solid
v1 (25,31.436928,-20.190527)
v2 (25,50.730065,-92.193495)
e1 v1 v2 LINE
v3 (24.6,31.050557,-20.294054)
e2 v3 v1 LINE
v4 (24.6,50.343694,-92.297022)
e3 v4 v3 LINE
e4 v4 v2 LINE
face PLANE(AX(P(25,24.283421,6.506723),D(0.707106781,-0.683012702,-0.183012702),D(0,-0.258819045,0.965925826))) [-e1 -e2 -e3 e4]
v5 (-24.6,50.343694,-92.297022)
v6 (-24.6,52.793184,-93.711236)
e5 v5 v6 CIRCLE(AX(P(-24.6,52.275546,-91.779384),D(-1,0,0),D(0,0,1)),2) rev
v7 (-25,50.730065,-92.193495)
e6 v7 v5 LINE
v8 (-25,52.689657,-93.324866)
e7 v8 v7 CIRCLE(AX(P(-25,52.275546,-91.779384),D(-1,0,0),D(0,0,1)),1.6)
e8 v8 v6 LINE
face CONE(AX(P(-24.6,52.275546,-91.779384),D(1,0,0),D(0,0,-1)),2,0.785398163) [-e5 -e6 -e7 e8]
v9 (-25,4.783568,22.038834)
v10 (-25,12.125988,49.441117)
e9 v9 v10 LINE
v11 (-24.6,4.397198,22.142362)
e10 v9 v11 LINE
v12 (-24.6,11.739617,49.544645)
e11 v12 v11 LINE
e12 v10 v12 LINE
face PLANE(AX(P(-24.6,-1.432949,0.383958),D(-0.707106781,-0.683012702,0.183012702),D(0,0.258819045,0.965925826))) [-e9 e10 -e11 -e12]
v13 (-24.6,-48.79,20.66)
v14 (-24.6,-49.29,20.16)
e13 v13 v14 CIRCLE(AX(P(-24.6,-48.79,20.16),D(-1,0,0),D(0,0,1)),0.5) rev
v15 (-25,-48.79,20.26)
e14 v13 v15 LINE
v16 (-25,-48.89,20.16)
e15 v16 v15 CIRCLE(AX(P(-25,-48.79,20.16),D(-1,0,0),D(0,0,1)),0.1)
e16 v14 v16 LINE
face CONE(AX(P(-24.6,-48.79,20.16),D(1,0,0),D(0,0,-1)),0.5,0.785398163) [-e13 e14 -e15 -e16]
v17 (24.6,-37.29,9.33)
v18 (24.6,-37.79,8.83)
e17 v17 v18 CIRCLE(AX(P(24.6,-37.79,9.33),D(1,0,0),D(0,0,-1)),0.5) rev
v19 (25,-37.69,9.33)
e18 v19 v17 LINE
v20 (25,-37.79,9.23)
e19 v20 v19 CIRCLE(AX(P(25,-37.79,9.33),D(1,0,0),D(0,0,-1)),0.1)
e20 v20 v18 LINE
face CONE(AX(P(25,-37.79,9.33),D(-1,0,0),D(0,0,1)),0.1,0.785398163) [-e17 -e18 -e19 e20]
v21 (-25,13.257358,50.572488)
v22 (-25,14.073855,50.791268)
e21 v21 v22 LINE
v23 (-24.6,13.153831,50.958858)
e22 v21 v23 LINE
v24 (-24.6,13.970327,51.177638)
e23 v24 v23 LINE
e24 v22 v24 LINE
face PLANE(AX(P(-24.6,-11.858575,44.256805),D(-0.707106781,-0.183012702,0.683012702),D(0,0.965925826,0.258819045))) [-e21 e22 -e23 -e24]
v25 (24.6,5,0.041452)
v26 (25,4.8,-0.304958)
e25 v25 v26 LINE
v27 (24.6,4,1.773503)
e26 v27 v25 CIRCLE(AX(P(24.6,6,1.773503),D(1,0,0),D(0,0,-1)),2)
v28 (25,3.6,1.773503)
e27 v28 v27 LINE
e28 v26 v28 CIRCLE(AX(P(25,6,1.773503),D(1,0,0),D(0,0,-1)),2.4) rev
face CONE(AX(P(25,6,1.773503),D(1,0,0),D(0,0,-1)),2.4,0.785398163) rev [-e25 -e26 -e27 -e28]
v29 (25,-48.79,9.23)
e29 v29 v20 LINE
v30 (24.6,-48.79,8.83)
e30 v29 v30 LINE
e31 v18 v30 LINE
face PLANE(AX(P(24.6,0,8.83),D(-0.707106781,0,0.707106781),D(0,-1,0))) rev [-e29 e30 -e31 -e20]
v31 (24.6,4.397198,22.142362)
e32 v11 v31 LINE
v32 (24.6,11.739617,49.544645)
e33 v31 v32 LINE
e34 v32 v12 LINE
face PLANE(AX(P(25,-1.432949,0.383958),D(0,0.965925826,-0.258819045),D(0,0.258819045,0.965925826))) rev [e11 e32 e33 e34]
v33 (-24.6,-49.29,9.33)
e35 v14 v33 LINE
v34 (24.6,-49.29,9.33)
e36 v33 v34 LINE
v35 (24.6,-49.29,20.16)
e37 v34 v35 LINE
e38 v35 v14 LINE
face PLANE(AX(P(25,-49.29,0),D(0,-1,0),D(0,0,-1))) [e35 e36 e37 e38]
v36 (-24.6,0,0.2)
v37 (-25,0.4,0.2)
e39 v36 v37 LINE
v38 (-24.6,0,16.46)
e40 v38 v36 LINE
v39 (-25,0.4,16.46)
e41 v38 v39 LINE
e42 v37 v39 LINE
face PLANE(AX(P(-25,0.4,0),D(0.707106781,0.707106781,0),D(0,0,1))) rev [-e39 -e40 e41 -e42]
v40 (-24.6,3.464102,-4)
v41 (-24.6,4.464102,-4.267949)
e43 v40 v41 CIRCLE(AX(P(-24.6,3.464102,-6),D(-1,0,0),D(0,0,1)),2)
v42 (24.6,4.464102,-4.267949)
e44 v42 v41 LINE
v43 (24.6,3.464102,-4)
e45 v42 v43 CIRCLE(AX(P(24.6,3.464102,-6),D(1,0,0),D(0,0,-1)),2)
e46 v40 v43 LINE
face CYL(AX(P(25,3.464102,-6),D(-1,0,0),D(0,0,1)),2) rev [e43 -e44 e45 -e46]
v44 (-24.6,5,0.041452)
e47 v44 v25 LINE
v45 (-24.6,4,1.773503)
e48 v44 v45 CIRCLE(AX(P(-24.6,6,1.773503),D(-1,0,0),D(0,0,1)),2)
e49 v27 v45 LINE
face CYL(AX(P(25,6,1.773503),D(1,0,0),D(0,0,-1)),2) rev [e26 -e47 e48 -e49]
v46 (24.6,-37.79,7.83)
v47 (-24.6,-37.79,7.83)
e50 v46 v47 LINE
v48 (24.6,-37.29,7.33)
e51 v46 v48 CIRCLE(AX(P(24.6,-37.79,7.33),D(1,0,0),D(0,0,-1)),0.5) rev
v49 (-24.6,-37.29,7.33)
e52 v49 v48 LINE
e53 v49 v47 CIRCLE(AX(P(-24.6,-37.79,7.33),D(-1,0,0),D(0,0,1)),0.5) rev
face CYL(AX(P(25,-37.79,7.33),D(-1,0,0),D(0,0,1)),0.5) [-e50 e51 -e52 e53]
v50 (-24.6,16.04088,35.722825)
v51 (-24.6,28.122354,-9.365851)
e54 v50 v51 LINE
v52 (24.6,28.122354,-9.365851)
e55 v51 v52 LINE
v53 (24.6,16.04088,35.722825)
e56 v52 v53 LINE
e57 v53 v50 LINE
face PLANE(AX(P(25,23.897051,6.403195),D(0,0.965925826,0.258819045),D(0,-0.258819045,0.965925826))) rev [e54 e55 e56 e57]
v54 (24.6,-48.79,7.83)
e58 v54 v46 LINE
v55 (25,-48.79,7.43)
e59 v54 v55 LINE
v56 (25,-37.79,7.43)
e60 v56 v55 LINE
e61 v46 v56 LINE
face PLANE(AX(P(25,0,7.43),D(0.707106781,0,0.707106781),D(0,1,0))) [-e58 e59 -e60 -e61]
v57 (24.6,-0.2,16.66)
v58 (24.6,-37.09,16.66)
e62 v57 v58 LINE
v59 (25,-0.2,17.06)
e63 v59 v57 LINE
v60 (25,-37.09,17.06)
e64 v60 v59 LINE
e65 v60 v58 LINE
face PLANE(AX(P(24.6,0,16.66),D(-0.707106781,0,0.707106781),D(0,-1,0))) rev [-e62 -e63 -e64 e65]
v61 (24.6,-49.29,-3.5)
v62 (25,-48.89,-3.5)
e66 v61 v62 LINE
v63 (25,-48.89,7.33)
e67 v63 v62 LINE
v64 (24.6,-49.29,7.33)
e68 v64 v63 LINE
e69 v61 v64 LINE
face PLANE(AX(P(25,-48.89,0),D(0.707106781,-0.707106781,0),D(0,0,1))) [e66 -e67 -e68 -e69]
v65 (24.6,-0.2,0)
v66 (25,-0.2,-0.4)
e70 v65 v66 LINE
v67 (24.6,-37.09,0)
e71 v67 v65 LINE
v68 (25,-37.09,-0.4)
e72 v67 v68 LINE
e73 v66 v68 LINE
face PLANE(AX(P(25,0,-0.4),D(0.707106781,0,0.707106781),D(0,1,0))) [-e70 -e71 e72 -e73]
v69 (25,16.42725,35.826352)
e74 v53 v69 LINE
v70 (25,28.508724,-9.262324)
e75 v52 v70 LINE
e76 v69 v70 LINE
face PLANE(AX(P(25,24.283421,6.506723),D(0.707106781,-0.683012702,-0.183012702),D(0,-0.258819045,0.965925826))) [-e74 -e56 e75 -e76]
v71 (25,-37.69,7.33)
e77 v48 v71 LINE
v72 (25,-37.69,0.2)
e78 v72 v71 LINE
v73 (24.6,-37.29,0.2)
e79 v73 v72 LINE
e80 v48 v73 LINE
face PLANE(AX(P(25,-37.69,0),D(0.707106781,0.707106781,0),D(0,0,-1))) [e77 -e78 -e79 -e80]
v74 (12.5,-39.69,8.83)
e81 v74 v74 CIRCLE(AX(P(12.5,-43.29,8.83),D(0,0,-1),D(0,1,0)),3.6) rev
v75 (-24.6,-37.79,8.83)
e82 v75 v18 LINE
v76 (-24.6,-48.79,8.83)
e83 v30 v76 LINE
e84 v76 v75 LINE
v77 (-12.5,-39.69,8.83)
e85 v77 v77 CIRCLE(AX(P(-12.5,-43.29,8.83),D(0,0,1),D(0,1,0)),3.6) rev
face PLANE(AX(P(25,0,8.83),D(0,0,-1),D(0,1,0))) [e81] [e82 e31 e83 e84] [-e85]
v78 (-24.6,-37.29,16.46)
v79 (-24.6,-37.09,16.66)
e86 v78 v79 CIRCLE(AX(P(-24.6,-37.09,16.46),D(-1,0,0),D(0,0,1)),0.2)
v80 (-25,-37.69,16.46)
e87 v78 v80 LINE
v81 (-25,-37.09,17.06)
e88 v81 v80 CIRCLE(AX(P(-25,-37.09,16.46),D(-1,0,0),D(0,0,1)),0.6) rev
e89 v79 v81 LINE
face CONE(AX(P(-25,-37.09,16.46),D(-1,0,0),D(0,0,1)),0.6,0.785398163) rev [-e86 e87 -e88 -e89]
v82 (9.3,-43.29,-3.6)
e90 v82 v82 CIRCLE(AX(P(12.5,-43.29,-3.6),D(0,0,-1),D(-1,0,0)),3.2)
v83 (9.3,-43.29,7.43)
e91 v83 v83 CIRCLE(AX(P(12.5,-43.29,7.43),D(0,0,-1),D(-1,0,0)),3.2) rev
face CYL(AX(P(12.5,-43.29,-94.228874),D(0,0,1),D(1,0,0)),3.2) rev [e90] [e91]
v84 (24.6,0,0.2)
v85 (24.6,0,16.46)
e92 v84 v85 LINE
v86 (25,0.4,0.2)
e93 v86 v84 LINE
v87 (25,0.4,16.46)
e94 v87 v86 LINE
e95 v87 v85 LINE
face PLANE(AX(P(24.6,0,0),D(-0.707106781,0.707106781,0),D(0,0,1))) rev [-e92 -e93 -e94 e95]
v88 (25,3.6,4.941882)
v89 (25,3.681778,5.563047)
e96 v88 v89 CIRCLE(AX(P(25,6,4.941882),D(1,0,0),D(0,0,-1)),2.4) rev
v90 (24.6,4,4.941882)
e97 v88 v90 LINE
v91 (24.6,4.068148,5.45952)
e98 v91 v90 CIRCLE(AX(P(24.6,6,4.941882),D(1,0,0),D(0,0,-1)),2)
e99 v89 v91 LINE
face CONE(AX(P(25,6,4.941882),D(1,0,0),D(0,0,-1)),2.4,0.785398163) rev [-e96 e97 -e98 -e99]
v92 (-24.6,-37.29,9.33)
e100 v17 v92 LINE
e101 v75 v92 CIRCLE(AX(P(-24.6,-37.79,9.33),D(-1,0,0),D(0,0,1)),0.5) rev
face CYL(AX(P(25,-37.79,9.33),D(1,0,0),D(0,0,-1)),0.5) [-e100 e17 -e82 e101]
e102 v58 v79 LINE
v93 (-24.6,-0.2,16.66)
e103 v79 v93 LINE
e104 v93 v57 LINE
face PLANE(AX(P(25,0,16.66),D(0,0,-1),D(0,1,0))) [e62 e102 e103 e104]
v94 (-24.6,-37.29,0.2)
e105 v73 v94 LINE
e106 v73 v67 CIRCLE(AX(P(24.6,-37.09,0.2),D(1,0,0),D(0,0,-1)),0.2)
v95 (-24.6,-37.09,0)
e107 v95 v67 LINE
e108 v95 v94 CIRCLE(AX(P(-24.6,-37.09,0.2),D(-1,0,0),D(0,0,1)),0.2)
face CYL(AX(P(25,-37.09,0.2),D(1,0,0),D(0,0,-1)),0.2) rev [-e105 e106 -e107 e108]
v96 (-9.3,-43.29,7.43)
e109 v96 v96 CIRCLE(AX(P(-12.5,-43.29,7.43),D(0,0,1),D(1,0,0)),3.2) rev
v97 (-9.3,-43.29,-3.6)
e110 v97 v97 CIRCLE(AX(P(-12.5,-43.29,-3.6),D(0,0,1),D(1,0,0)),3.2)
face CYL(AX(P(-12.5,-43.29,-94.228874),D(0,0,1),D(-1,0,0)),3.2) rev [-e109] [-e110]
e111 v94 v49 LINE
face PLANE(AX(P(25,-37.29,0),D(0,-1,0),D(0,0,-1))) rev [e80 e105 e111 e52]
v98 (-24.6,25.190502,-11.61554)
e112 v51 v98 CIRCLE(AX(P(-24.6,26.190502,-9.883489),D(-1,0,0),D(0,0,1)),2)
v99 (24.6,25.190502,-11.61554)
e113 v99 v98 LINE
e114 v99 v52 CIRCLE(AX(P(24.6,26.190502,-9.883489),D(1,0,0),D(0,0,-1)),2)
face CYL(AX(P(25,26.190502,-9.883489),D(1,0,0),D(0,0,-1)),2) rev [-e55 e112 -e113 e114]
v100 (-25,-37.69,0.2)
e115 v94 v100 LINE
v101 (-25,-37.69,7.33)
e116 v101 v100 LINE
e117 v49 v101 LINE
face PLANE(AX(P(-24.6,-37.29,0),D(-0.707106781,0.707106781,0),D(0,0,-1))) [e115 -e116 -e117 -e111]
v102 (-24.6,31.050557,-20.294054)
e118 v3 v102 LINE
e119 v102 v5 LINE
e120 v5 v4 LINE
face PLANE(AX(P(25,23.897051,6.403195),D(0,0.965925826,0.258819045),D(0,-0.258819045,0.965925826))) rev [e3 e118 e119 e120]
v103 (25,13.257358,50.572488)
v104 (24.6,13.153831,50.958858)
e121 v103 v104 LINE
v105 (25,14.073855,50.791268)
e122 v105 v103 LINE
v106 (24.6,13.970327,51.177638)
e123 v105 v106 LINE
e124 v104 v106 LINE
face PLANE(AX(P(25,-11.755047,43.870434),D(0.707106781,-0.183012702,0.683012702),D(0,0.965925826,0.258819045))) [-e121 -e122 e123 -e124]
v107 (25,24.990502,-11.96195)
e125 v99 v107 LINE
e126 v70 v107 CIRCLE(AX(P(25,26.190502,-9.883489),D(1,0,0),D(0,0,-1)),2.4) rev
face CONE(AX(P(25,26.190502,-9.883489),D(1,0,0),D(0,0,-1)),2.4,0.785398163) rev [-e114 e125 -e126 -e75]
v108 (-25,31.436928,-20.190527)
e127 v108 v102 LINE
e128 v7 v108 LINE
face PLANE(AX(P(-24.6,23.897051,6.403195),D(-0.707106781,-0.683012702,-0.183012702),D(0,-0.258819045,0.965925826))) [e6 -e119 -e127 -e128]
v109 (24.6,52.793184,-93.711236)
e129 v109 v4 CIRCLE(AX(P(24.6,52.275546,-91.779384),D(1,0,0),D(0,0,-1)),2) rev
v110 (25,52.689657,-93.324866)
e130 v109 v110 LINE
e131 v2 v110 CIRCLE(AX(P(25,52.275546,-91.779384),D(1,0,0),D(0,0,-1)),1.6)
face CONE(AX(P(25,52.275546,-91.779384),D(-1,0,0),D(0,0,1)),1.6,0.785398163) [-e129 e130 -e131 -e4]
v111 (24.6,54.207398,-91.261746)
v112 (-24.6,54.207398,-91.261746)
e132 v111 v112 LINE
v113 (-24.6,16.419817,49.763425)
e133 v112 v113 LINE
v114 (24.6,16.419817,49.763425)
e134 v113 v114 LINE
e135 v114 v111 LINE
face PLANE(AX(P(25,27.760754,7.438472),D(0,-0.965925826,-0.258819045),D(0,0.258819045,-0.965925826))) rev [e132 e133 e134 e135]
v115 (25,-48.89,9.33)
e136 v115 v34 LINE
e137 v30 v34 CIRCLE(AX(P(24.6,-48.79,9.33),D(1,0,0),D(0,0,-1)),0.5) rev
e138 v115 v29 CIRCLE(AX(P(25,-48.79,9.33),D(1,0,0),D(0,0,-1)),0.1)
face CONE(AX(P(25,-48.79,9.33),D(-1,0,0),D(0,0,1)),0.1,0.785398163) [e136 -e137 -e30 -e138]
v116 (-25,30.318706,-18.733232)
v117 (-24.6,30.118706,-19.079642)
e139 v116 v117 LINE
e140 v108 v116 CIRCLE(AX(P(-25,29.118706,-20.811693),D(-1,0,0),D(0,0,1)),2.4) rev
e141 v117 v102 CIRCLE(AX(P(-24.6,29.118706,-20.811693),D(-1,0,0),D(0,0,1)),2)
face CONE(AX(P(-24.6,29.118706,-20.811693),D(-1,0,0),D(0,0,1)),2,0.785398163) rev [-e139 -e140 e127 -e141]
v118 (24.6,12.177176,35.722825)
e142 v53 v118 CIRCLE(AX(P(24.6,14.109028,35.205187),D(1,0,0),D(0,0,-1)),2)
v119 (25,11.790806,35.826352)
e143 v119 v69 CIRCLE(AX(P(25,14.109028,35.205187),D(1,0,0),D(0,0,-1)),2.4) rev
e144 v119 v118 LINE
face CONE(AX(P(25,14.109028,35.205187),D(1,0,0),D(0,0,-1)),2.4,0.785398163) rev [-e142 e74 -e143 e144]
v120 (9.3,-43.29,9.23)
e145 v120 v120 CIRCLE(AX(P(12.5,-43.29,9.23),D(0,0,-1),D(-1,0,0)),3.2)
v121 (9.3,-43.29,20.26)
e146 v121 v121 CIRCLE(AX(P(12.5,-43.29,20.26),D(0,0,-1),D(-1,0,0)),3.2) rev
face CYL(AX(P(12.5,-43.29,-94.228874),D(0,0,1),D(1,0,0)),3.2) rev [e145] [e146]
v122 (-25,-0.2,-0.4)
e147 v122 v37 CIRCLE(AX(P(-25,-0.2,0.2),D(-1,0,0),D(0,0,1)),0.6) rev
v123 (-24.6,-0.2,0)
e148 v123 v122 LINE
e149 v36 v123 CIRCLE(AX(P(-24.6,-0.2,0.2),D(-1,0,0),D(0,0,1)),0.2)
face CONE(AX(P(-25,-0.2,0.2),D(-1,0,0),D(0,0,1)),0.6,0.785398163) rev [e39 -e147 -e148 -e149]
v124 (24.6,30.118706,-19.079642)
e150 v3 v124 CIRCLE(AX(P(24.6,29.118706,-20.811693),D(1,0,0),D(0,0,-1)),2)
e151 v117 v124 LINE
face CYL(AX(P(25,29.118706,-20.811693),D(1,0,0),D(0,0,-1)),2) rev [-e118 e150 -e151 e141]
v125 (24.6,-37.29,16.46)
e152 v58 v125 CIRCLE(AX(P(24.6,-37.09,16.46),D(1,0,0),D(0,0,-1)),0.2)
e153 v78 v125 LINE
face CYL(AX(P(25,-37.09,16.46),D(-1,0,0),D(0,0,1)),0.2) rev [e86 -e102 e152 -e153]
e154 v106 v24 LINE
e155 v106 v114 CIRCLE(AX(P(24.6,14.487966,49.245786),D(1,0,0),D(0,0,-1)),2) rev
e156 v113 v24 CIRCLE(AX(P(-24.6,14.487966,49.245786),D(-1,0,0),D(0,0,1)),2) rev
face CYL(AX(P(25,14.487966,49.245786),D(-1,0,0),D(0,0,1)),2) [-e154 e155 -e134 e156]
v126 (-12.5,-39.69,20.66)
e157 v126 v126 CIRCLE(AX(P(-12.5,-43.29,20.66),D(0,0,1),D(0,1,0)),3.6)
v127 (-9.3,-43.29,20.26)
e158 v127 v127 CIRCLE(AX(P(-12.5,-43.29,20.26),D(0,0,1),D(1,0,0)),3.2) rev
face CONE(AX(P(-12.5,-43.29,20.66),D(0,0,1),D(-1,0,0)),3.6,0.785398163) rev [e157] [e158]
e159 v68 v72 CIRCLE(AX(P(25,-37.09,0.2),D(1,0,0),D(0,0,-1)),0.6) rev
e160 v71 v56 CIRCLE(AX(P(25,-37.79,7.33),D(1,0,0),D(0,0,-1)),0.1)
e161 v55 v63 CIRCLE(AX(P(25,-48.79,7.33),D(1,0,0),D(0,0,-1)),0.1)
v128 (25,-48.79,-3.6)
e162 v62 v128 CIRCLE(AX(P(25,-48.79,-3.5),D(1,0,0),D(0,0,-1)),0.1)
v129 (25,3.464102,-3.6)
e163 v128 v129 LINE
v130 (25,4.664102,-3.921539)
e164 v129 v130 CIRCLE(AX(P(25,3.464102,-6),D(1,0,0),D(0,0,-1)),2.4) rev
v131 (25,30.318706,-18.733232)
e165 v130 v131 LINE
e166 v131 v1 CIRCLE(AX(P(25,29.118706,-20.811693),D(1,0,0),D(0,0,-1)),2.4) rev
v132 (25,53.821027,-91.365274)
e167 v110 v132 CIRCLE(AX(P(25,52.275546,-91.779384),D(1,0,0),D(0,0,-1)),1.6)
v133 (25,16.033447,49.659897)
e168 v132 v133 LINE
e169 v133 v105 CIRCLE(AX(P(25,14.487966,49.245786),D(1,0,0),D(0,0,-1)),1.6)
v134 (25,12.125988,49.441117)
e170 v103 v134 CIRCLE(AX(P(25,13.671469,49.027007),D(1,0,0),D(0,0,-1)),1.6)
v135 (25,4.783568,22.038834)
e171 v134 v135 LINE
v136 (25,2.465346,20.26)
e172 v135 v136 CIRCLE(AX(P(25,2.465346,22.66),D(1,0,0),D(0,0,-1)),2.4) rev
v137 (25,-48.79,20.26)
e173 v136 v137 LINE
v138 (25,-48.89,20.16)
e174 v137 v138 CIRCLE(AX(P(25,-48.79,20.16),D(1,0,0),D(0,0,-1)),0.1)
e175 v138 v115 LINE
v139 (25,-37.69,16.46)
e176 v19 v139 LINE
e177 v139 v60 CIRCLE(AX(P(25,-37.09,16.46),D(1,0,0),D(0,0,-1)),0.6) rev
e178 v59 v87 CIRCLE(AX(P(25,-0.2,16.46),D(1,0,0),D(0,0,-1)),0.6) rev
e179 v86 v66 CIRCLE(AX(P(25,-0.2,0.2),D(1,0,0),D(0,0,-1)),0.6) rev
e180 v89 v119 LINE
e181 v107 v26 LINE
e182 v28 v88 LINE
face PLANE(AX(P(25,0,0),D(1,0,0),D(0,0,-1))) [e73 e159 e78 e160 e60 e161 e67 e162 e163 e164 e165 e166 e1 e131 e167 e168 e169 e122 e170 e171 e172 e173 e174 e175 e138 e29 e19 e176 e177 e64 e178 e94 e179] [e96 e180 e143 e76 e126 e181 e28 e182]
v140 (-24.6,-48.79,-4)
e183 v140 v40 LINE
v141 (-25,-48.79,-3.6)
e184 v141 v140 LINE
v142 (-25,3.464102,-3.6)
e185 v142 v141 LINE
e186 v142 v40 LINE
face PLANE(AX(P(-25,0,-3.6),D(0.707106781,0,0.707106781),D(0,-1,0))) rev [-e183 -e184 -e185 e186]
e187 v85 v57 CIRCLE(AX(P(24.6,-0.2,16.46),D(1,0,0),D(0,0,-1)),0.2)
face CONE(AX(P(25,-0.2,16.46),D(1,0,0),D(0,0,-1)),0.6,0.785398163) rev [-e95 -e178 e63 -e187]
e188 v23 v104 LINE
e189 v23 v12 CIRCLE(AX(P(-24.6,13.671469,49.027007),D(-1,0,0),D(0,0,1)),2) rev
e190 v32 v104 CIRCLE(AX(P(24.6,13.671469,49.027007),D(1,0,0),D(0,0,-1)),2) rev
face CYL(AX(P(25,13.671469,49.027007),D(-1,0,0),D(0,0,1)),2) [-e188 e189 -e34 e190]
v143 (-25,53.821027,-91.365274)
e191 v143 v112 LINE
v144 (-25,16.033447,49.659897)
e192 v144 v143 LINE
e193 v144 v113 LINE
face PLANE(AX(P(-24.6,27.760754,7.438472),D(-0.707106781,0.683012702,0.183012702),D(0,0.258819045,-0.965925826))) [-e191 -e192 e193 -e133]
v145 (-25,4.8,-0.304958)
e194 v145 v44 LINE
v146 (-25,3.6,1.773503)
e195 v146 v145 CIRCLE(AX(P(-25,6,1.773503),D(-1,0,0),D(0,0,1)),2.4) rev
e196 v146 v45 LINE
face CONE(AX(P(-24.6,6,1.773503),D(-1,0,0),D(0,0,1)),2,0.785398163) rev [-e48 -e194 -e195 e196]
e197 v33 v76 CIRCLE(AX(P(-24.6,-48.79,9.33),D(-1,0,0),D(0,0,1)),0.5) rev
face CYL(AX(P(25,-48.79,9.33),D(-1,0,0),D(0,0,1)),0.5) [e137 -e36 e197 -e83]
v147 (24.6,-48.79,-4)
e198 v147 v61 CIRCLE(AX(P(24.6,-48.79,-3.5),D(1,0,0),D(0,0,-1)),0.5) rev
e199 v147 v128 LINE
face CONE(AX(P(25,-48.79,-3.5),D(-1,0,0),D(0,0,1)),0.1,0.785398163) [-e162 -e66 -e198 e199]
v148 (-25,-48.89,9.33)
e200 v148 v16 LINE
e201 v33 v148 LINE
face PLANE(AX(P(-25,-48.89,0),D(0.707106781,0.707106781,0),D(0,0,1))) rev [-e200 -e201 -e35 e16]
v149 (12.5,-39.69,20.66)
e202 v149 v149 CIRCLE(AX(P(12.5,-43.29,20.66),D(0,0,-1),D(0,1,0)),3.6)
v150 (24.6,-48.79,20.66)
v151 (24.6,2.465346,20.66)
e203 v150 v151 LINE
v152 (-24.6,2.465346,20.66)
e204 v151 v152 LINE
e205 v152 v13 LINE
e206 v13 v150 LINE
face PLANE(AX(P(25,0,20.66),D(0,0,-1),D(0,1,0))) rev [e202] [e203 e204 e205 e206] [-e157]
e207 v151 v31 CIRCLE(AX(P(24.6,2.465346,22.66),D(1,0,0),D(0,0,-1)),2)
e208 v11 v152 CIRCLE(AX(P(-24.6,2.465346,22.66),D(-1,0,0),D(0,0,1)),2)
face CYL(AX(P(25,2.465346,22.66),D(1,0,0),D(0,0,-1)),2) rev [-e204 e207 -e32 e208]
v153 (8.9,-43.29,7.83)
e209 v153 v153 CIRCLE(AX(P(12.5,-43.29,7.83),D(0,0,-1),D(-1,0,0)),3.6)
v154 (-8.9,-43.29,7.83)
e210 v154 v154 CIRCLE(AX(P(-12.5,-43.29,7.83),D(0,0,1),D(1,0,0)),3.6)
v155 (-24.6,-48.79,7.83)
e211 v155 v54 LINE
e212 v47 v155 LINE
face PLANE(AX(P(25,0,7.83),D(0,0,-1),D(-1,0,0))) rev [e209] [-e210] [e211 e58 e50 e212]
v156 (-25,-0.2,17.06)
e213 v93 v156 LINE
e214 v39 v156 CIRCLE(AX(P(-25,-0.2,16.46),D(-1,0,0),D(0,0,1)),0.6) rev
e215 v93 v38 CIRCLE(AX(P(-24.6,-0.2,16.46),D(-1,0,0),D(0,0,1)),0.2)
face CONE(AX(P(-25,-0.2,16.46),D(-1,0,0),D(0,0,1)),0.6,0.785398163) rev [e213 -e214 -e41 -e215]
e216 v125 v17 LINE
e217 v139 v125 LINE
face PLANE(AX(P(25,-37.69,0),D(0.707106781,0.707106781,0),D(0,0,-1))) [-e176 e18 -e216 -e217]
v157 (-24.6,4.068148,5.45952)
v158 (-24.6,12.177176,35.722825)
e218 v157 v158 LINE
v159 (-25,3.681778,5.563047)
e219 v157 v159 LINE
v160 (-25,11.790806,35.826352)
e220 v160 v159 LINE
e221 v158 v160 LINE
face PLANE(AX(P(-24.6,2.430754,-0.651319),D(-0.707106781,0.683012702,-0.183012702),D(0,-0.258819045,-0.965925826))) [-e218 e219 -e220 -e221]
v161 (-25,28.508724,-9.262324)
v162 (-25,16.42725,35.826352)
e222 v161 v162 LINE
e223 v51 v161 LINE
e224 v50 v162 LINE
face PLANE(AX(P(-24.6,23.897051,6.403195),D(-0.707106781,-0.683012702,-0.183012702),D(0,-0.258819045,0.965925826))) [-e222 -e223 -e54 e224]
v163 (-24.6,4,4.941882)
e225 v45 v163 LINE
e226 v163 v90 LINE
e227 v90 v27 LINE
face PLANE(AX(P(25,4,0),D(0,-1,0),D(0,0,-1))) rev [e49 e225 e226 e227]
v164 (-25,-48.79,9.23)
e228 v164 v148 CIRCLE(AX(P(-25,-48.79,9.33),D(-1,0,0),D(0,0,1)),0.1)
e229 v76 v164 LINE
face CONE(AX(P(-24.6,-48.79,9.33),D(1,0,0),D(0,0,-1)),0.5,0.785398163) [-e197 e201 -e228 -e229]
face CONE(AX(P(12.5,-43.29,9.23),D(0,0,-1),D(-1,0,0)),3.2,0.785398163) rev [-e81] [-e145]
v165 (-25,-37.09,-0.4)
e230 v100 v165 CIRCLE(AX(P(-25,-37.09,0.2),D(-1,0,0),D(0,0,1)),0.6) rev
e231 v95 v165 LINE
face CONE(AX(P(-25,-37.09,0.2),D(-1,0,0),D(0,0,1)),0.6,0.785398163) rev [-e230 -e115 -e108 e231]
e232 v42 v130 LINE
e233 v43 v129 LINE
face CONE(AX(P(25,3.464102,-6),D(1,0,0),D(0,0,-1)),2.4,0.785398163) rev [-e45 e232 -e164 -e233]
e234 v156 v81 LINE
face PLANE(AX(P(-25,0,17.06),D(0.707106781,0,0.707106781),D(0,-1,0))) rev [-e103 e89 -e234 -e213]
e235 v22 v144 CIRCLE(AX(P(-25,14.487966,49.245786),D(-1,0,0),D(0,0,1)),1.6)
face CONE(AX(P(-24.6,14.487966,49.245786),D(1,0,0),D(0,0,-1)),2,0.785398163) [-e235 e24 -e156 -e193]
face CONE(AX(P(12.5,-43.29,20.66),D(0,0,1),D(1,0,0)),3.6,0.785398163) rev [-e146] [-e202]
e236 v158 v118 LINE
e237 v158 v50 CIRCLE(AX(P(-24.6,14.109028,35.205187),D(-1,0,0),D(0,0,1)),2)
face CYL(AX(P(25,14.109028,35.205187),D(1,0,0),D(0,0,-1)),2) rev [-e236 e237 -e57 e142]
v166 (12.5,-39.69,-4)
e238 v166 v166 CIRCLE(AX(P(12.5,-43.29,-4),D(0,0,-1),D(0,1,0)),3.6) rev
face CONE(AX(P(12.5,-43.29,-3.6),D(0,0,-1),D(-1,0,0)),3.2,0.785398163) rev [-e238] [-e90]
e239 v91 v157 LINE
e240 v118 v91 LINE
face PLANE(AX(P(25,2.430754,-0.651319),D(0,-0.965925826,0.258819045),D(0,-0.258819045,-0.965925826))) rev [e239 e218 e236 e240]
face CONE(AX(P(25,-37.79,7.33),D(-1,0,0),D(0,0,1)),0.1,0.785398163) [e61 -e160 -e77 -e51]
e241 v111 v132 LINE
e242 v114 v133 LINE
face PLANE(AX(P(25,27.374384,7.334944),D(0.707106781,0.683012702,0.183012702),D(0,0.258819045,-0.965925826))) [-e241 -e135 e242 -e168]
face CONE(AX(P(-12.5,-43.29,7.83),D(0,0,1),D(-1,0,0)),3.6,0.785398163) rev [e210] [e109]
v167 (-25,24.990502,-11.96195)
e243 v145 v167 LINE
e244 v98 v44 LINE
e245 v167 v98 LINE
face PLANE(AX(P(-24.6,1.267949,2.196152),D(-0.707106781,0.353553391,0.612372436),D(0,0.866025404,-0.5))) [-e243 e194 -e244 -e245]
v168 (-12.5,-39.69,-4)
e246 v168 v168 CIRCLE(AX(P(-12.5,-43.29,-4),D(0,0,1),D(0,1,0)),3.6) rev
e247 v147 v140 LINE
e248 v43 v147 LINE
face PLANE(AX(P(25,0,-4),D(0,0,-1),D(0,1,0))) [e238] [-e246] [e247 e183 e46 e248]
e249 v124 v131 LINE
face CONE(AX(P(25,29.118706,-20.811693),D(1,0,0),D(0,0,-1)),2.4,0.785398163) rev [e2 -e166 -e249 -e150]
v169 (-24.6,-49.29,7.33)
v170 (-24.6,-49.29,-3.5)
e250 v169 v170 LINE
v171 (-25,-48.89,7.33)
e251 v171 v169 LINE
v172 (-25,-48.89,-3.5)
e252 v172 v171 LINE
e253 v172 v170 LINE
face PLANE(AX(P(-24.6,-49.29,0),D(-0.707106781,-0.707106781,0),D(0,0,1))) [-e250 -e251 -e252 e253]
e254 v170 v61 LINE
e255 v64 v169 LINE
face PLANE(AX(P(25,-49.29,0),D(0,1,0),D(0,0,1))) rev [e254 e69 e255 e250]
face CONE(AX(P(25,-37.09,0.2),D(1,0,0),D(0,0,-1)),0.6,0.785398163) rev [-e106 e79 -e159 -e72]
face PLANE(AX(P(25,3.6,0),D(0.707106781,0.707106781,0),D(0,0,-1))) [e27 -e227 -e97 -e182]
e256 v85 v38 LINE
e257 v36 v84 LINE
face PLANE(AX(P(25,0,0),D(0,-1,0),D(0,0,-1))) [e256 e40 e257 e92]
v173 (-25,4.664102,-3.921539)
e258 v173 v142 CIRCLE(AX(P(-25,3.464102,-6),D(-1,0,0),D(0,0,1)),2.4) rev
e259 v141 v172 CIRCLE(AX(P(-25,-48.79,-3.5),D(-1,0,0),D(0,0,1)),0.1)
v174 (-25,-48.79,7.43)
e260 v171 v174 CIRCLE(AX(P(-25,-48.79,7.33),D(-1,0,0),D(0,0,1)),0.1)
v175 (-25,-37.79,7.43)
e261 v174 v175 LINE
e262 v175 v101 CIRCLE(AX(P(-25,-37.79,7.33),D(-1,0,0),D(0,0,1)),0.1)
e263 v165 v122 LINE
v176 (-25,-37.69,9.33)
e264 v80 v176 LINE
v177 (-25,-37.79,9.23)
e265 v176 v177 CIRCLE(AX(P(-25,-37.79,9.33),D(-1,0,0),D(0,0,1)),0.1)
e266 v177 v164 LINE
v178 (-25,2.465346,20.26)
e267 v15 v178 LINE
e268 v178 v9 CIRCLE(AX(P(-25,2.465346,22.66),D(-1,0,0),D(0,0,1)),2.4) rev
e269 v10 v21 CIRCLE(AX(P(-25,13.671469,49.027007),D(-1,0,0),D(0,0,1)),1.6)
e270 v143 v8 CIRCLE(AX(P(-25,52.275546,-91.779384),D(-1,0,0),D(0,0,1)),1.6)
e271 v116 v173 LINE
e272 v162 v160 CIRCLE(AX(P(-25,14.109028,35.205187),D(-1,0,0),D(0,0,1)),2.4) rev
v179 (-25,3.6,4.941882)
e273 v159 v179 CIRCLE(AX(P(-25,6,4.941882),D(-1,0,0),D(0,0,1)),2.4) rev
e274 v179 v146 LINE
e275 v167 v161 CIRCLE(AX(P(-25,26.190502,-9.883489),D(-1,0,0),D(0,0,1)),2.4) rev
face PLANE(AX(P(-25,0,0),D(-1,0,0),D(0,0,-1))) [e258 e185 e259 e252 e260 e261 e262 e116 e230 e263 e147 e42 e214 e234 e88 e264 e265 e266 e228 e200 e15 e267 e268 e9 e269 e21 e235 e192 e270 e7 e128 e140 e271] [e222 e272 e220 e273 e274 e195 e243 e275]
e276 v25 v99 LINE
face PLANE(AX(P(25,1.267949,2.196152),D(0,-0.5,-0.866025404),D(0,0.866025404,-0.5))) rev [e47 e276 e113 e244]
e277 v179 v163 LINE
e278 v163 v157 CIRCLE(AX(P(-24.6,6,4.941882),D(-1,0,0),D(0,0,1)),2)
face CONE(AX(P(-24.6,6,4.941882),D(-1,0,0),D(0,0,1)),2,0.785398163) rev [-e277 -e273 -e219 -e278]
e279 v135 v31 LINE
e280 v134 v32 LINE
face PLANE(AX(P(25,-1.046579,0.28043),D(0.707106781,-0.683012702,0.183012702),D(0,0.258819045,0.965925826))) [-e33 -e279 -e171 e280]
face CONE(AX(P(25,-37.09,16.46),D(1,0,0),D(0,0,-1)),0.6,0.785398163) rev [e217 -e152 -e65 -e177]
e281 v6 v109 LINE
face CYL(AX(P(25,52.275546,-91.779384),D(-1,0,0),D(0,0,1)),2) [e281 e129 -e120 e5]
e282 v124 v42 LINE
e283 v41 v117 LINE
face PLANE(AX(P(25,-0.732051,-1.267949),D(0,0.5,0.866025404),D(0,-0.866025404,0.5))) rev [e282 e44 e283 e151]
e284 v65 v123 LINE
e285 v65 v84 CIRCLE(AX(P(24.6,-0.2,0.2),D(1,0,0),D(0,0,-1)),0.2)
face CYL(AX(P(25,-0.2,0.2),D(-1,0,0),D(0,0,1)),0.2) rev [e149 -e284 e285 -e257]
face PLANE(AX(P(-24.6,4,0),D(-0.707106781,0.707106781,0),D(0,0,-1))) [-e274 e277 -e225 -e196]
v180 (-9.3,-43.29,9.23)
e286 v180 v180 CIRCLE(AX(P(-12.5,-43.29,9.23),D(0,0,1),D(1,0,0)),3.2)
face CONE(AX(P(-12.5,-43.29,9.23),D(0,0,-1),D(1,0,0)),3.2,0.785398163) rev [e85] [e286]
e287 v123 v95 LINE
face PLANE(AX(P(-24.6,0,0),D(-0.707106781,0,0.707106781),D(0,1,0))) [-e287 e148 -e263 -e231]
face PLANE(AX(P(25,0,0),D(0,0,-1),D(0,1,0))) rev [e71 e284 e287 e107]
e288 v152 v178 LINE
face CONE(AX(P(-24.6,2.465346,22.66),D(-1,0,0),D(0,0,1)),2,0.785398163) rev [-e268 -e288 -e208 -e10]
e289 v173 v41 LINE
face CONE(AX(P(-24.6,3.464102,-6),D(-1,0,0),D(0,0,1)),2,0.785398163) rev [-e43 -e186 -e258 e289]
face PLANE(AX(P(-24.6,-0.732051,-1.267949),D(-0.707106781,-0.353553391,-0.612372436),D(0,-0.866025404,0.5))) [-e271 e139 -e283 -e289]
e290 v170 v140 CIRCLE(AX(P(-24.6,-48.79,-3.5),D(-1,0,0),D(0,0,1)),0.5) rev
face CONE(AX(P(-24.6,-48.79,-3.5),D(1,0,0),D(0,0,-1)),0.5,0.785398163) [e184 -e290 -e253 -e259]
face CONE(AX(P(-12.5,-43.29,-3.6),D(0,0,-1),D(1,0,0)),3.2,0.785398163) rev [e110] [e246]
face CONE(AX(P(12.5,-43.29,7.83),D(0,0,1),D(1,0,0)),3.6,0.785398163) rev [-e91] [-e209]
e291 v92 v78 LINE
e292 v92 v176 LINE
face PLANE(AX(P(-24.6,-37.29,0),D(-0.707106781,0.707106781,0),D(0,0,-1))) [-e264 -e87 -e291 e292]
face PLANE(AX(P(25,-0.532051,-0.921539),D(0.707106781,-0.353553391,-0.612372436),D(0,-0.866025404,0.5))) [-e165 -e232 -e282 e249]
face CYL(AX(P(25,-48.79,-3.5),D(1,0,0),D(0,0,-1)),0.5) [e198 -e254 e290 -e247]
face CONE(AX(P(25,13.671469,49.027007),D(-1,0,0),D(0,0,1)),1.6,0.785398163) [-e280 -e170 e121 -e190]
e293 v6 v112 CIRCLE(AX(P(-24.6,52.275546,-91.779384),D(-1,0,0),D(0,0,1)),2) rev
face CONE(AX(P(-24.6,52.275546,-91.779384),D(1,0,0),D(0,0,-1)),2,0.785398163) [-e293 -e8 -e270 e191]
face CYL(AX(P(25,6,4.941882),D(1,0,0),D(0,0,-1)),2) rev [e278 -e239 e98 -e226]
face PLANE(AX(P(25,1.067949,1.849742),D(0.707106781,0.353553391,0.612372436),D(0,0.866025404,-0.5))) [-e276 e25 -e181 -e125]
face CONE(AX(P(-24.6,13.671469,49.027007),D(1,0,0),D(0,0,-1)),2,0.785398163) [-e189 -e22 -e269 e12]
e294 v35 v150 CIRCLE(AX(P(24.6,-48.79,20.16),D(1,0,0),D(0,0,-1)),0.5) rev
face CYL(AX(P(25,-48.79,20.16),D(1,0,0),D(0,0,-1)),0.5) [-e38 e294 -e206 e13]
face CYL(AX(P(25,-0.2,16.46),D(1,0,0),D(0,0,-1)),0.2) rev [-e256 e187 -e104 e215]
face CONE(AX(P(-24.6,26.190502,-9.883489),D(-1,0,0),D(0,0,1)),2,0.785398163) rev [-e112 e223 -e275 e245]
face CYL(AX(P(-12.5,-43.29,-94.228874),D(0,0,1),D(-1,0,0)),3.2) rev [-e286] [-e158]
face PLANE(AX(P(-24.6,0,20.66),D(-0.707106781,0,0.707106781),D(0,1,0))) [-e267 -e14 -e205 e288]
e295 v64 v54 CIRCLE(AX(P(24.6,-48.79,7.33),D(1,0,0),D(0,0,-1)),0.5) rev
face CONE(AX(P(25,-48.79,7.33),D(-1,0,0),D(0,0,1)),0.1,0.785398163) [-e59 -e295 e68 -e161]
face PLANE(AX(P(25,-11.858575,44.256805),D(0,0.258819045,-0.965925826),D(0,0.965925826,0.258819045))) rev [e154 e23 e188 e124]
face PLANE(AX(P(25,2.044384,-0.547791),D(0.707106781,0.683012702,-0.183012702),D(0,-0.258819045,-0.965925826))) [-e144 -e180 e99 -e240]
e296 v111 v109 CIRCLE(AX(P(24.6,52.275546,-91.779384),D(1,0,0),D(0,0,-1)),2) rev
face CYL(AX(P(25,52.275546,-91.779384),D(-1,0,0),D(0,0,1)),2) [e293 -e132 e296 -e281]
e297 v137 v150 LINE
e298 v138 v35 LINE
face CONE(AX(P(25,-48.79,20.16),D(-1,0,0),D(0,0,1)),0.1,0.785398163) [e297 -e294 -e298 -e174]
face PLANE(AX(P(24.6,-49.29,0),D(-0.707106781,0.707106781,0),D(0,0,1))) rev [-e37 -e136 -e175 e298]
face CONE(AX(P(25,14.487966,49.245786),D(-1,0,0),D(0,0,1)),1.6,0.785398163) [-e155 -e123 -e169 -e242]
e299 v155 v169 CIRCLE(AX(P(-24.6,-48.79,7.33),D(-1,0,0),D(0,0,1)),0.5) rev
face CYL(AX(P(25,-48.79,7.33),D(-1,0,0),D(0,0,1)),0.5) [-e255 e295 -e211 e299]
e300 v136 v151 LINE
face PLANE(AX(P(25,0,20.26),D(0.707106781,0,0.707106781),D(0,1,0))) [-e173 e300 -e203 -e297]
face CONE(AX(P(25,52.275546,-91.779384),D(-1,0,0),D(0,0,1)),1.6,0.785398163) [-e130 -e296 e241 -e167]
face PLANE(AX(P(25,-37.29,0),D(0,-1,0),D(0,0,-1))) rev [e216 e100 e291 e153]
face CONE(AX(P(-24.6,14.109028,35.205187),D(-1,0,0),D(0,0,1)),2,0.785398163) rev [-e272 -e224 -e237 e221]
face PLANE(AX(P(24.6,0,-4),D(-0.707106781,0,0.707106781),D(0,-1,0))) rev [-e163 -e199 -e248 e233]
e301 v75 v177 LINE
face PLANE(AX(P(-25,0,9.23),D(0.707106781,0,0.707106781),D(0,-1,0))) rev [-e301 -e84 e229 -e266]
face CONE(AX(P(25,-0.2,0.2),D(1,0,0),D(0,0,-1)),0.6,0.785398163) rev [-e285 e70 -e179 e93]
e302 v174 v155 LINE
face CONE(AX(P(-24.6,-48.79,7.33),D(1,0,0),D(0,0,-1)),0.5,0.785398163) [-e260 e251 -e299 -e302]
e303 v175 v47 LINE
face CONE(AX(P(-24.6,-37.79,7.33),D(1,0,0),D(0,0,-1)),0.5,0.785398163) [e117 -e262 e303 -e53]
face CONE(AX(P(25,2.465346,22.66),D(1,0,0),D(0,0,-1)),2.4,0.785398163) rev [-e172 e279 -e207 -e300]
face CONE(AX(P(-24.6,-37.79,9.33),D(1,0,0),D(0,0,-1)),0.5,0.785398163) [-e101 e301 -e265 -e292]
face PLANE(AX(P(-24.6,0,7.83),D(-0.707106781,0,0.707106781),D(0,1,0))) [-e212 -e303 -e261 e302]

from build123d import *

# Parameters (mm, degrees)
SKETCH1_W               = 8
SKETCH1_H               = 11.83
BOSS_EXTRUDE1_DEPTH     = 25
CUT_EXTRUDE1_DEPTH      = 119.472964421
CUT_EXTRUDE1_DEPTH_BACK = 119.472964421
FILLET1_R               = 2
FILLET2_R               = 0.5
CHAMFER1_SIZE           = 0.4
FILLET3_R               = 0.2
CHAMFER2_SIZE           = 0.4


with BuildPart() as part:
    # Sketch1 → Boss-Extrude1 (new body)
    with BuildSketch(Plane.YZ):
        Polygon((-41.29, -4), (4, -4), (4, 0.618802154), (4, 5.205186779), (4, 20.66), (-41.29, 20.66), (-41.29, 8.83), (-37.29, 8.83), (-37.29, 16.66), (0, 16.66), (0, 0), (-37.29, 0), (-37.29, 7.83), (-41.29, 7.83), align=None)
        Polygon((4, 0.618802154), (4, -4), (30.836144658, -19.493855342), (50.861332538, -94.228873943), (54.725035843, -93.193597763), (15.902179078, 51.69527618), (12.038475773, 50.66), (4, 20.66), (4, 5.205186779), (14.109028134, 42.93259339), (29.372043043, -14.029753727), align=None)
        with Locations((-45.29, 14.745)):
            Rectangle(SKETCH1_W, SKETCH1_H)
        with Locations((-45.29, 1.915)):
            Rectangle(SKETCH1_W, SKETCH1_H)
    extrude(amount=BOSS_EXTRUDE1_DEPTH)

    # Sketch2 → Cut-Extrude1 (cut, two sides: drawn at the far end of the back side and taken through both)
    with BuildSketch(Plane.XY.offset(7.83).offset(-CUT_EXTRUDE1_DEPTH_BACK)):
        with BuildLine():
            ThreePointArc((9.3, -43.29), (12.5, -46.49), (15.7, -43.29))
            Line((15.7, -43.29), (9.3, -43.29))
        make_face()
        with BuildLine():
            Line((9.3, -43.29), (15.7, -43.29))
            ThreePointArc((15.7, -43.29), (12.5, -40.09), (9.3, -43.29))
        make_face()
    extrude(amount=CUT_EXTRUDE1_DEPTH + CUT_EXTRUDE1_DEPTH_BACK, mode=Mode.SUBTRACT)

    # Fillet1
    fillet1_edges = [part.edges().sort_by_distance(p)[0] for p in [
        (12.5, 4, -4),
        (12.5, 30.836144658, -19.493855342),
        (12.5, 50.861332538, -94.228873943),
        (12.5, 54.725035843, -93.193597763),
        (12.5, 15.902179078, 51.69527618),
        (12.5, 12.038475773, 50.66),
        (12.5, 14.109028134, 42.93259339),
        (12.5, 29.372043043, -14.029753727),
        (12.5, 4, 0.618802154),
        (12.5, 4, 5.205186779),
        (12.5, 4, 20.66),
    ]]
    fillet(fillet1_edges, radius=FILLET1_R - 0.0001)  # a hair under: the kernel refuses the full size

    # Fillet2
    fillet2_edges = [part.edges().sort_by_distance(p)[0] for p in [
        (12.5, -37.29, 8.83),
        (12.5, -49.29, 8.83),
        (12.5, -49.29, 20.66),
        (12.5, -49.29, -4),
        (12.5, -49.29, 7.83),
        (12.5, -37.29, 7.83),
    ]]
    fillet(fillet2_edges, radius=FILLET2_R)

    # Chamfer1
    chamfer1_edges = [part.edges().sort_by_distance(p)[0] for p in [
        (15.7, -43.29, 7.83),
        (15.7, -43.29, -4),
        (15.7, -43.29, 20.66),
        (15.7, -43.29, 8.83),
    ]]
    chamfer(chamfer1_edges, length=CHAMFER1_SIZE)

    # Mirror1: part across plane


with BuildPart() as part_1:
    add(part.part)
    add(part.part.mirror(Plane(origin=(0, 0, 0), x_dir=(0, 0, 1), z_dir=(1, 0, 0))))

    # Fillet3
    fillet3_edges = [part_1.edges().sort_by_distance(p)[0] for p in [
        (0, -37.29, 0),
        (0, 0, 0),
        (0, 0, 16.66),
        (0, -37.29, 16.66),
    ]]
    fillet(fillet3_edges, radius=FILLET3_R)

    # Chamfer2
    chamfer2_edges = [part_1.edges().sort_by_distance(p)[0] for p in [
        (25, 54.00763278, -92.779404911),
        (25, 51.27552539, -93.51147088),
        (25, 3.981740618, -4.06814494),
        (25, 30.70541894, -19.594164714),
        (25, 14.109028134, 37.20547315),
        (25, 27.408123551, -11.470324016),
        (25, 4.267935795, 0.773494957),
        (25, 4.017109422, 5.202934281),
        (25, 3.682884739, 21.073272655),
        (25, -43.29, 7.83),
        (25, -49.29, 14.745),
        (25, -43.29, 8.83),
        (25, -37.29, 12.895),
        (25, -49.29, 1.915),
        (25, -49.143553391, 20.513553391),
        (25, -49.143553391, -3.853553391),
        (25, -49.143553391, 8.976446609),
        (25, -49.143553391, 7.683553391),
        (25, -37.436446609, 8.976446609),
        (25, -37.436446609, 7.683553391),
        (-25, -43.29, 7.83),
        (-25, -49.29, 1.915),
        (-25, 17.291410002, -11.673799143),
        (-25, 40.697133492, -56.295566685),
        (-25, 35.313607461, -20.749160791),
        (-25, 13.562099547, 51.06825376),
        (-25, 8.068405021, 35.843494244),
        (-25, -23.162288622, 20.66),
        (-25, -37.29, 12.895),
        (-25, 15.095330785, -5.787090062),
        (-25, 4, 3.357669953),
        (-25, 8.122709007, 20.591346258),
        (-25, 22.081599912, 13.178550448),
        (-25, -43.29, 8.83),
        (-25, -49.29, 14.745),
        (-25, -22.662935795, -4),
        (-25, 3.981740618, -4.06814494),
        (-25, 30.70541894, -19.594164714),
        (-25, 54.00763278, -92.779404911),
        (-25, 51.27552539, -93.51147088),
        (-25, 15.487986226, 50.977873117),
        (-25, 12.257244433, 50.441231339),
        (-25, 14.109028134, 37.20547315),
        (-25, 27.408123551, -11.470324016),
        (-25, 4.267935795, 0.773494957),
        (-25, 4.017109422, 5.202934281),
        (-25, 3.682884739, 21.073272655),
        (-25, -37.436446609, 7.683553391),
        (-25, -37.436446609, 8.976446609),
        (-25, -49.143553391, 7.683553391),
        (-25, -49.143553391, 8.976446609),
        (-25, -49.143553391, -3.853553391),
        (-25, -49.143553391, 20.513553391),
        (-25, -18.645, 0),
        (25, -18.645, 0),
        (-25, 0, 8.33),
        (25, 0, 8.33),
        (-25, -37.29, 3.765),
        (25, -37.29, 3.765),
        (-25, -18.645, 16.66),
        (25, -18.645, 16.66),
        (-25, -0.058578644, 0.058578644),
        (25, -0.058578644, 0.058578644),
        (-25, -37.231421356, 0.058578644),
        (25, -37.231421356, 0.058578644),
        (-25, -37.231421356, 16.601421356),
        (25, -37.231421356, 16.601421356),
        (-25, -0.058578644, 16.601421356),
        (25, -0.058578644, 16.601421356),
        (25, 17.291410002, -11.673799143),
        (25, -22.662935795, -4),
        (25, 40.697133492, -56.295566685),
        (25, 15.095330785, -5.787090062),
        (25, 4, 3.357669953),
        (25, 8.122709007, 20.591346258),
        (25, 22.081599912, 13.178550448),
        (25, 35.313607461, -20.749160791),
        (25, 13.562099547, 51.06825376),
        (25, 8.068405021, 35.843494244),
        (25, -23.162288622, 20.66),
        (25, 12.257244433, 50.441231339),
        (25, 15.487986226, 50.977873117),
    ]]
    chamfer(chamfer2_edges, length=CHAMFER2_SIZE)


solid = part_1.part
